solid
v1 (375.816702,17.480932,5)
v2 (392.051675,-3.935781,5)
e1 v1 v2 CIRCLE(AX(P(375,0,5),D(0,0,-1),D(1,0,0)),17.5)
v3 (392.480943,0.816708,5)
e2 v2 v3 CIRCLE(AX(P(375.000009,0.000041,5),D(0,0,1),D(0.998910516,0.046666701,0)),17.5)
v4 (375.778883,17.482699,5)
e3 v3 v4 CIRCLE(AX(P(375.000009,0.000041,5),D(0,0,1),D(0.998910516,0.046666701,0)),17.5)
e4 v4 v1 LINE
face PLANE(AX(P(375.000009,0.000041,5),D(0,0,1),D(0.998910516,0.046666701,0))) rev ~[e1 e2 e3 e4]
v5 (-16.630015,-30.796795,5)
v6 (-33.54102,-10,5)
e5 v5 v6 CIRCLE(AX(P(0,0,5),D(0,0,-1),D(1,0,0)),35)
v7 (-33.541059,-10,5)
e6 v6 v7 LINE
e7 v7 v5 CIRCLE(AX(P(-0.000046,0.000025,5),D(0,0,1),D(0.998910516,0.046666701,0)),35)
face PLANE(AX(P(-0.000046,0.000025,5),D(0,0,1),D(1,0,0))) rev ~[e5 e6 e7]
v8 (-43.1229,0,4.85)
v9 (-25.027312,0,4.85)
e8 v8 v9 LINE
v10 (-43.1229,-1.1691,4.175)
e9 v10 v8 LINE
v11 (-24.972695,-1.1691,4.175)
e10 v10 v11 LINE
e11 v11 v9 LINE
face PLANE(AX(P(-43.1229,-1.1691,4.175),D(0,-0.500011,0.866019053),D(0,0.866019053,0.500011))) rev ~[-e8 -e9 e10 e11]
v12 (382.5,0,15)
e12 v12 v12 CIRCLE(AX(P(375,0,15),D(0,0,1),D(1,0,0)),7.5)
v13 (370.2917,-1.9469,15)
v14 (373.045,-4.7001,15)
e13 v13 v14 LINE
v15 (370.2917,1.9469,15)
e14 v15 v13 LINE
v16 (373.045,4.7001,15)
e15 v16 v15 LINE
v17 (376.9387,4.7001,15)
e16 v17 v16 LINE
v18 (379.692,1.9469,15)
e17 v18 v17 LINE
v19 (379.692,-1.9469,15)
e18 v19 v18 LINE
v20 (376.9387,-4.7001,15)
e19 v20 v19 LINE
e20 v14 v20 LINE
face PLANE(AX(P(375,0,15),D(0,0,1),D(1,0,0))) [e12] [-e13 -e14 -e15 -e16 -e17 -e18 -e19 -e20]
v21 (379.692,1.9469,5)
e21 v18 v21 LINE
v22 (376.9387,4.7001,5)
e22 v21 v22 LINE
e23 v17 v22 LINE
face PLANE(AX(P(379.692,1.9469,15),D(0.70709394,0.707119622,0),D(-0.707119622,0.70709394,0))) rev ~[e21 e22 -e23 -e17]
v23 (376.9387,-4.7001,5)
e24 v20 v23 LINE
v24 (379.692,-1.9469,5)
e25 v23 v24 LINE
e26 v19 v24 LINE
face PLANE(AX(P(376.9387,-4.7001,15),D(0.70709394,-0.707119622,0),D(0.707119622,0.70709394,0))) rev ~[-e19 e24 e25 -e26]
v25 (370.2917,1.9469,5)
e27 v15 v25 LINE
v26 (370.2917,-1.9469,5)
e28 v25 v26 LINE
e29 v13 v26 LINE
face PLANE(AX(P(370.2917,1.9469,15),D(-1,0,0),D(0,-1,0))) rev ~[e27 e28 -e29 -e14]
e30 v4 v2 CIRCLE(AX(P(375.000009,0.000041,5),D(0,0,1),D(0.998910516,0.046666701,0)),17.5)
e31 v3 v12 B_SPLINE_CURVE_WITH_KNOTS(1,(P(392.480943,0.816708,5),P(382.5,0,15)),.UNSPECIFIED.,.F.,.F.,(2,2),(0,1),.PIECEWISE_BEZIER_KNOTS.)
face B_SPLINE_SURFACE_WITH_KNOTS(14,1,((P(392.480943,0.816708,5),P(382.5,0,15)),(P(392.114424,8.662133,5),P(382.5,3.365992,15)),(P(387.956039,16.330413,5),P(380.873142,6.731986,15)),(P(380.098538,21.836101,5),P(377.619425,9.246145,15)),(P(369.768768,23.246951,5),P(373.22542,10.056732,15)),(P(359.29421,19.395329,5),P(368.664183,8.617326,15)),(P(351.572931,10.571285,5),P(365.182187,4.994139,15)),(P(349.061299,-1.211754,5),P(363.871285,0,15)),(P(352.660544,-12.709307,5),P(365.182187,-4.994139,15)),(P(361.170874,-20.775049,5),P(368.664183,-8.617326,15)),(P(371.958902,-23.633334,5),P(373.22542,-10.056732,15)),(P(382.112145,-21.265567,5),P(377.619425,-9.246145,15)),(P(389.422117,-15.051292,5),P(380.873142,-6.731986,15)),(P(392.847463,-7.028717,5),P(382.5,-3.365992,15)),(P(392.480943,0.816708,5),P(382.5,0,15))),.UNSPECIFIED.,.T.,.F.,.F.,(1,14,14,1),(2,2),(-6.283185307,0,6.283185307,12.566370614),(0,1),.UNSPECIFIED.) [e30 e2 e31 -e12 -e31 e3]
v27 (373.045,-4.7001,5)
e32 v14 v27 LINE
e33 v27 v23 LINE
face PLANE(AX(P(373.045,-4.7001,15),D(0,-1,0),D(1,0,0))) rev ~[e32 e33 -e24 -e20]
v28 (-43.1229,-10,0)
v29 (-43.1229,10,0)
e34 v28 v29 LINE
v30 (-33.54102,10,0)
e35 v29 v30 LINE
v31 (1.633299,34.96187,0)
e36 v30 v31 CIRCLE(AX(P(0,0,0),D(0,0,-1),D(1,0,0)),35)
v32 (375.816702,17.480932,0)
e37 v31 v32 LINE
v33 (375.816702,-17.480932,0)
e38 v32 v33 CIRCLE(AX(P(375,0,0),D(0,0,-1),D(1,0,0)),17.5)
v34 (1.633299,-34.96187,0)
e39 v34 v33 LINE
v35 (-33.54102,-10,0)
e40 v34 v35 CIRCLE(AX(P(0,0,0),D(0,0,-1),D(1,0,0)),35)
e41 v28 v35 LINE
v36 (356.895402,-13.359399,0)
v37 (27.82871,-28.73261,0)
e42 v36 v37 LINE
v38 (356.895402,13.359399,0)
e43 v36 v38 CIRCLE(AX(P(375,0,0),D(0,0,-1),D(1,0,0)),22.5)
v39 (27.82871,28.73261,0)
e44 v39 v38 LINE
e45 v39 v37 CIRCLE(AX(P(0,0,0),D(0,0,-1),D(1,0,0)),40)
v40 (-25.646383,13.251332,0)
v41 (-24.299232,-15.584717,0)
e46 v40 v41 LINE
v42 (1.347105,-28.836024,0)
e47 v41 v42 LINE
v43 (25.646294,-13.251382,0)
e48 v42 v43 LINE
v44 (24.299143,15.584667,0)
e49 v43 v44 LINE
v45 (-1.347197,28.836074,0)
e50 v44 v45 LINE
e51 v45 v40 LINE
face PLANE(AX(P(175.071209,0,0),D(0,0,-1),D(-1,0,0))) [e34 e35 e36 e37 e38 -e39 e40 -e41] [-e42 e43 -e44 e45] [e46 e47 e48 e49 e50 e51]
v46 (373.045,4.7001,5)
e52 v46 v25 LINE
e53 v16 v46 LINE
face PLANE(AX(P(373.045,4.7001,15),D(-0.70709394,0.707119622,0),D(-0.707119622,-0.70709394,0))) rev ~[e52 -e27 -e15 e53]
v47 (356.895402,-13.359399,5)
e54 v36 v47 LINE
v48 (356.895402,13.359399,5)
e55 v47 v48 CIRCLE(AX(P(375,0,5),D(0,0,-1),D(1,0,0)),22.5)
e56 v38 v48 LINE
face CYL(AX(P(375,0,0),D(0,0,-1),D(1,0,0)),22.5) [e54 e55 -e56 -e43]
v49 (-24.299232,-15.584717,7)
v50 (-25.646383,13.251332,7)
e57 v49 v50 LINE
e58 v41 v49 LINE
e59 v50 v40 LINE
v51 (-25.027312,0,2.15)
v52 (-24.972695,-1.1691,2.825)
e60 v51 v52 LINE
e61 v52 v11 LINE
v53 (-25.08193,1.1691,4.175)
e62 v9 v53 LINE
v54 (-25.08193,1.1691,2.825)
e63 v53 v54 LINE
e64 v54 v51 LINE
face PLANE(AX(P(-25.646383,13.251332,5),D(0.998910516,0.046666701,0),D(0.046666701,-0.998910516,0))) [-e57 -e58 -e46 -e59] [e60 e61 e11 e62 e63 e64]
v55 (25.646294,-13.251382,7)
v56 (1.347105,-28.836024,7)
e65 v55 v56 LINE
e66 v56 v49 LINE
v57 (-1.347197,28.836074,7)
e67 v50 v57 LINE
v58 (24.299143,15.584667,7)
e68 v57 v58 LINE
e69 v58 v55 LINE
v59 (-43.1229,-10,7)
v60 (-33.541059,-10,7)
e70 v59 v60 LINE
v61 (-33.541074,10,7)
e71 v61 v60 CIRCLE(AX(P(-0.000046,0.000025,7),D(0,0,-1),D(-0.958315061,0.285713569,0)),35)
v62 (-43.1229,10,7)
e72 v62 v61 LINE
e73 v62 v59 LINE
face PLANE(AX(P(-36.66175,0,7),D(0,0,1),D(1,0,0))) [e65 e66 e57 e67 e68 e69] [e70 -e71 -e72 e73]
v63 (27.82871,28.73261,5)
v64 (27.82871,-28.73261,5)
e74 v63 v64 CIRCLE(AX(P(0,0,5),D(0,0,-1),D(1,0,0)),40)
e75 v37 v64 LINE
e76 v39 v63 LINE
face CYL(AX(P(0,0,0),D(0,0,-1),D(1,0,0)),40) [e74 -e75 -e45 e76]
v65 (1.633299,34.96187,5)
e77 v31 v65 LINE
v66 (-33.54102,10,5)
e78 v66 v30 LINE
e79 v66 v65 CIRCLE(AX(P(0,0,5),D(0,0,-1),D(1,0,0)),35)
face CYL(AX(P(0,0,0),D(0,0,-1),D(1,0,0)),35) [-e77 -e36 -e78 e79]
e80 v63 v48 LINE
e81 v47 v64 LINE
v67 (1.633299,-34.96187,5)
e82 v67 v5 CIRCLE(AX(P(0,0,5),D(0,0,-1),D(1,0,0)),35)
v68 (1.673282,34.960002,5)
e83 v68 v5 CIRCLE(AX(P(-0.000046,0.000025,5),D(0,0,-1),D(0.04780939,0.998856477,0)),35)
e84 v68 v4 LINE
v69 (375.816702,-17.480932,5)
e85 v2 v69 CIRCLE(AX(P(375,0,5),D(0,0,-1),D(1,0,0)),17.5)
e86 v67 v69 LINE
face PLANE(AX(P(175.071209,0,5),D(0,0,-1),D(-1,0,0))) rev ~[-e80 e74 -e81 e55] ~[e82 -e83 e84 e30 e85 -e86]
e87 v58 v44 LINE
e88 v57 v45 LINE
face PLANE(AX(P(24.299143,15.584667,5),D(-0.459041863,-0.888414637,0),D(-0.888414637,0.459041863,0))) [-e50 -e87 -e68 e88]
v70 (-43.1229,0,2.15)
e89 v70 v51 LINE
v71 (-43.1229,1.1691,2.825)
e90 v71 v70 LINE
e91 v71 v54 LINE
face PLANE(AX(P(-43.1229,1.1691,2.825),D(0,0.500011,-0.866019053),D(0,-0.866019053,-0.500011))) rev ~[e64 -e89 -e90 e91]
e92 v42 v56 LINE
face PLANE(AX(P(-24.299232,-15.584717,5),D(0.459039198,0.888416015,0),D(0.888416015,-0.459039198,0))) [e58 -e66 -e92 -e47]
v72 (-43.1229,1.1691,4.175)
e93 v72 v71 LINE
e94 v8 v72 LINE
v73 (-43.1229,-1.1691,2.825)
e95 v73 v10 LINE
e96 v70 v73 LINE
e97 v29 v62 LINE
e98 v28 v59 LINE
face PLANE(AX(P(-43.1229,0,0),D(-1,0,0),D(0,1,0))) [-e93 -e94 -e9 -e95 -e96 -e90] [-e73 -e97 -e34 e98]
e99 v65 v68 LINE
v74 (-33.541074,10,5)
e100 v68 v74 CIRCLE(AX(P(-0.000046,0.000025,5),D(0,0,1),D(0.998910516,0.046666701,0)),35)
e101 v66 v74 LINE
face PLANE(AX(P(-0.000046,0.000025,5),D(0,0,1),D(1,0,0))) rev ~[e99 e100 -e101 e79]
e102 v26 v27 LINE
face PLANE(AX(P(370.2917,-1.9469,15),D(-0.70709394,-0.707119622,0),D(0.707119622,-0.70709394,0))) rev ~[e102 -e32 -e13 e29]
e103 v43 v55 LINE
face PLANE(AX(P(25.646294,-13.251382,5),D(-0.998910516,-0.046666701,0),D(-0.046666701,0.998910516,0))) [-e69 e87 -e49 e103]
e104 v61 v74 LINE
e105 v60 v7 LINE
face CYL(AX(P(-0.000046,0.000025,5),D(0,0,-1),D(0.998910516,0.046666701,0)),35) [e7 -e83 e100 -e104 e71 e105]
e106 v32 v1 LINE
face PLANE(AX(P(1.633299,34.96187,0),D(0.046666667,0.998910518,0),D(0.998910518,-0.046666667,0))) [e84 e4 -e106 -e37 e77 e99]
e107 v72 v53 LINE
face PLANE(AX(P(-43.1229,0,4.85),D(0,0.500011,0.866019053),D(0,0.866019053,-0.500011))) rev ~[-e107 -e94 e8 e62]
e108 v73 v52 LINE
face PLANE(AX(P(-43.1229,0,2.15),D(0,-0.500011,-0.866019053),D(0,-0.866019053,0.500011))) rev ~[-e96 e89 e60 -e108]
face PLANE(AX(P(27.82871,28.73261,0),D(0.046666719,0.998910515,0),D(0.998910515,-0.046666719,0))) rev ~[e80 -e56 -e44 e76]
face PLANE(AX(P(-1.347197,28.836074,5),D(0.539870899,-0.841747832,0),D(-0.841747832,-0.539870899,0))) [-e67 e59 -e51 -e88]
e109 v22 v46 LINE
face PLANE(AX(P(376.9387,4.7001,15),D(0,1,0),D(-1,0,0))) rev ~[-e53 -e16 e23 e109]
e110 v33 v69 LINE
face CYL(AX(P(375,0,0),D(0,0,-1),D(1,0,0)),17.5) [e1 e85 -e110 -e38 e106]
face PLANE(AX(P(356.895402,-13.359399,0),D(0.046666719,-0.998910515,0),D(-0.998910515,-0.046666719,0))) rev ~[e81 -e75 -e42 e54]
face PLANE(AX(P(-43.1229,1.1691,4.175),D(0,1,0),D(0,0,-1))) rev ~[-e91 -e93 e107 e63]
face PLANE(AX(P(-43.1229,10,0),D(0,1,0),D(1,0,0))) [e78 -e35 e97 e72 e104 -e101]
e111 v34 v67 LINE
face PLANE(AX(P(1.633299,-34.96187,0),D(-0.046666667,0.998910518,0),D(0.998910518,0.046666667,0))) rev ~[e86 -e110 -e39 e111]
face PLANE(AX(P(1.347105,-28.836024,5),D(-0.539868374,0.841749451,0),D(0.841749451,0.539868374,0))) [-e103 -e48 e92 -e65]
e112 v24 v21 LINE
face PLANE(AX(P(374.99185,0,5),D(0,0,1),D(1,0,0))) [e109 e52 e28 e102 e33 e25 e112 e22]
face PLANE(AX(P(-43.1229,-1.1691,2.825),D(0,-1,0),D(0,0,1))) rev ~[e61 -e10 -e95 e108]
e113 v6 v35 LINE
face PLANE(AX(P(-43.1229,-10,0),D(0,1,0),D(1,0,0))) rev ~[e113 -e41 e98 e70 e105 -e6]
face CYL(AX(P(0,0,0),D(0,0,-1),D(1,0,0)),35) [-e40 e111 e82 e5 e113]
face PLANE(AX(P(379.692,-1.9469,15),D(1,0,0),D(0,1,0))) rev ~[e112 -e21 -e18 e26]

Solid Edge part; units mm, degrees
sketch "Sketch1" plane through (0, 0, 0) normal (0, 0, 1) x (1, 0, 0)
  line L0 (1.6333, 34.9619) -> (375.8167, 17.4809)
  line L1 (1.6333, -34.9619) -> (375.8167, -17.4809)
  arc A0 (1.6333, -34.9619) -> (1.6333, 34.9619) centre (0, 0) cw
  arc A1 (375.8167, 17.4809) -> (375.8167, -17.4809) centre (375, 0) cw
extrude "Protrusion1" add sketch "Sketch1" along normal blind 5
sketch "Sketch2" plane through (178.75, 0, 5) normal (0, 0, 1) x (0.9989105, 0.0466667, 0)
  circle A0 centre (-178.5553, 8.3417) radius 35
extrude "ExtrudedProtrusion_2" add sketch "Sketch2" along normal blind 2
sketch "Sketch3" plane through (178.75, 0, 5) normal (0, 0, 1) x (0.9989105, 0.0466667, 0)
  circle A0 centre (196.0362, -9.1583) radius 17.5
sketch "Sketch4" plane through (0, 0, 15) normal (0, 0, 1) x (1, 0, 0)
  circle A0 centre (375, 0) radius 7.5
loft "LoftedProtrusion1" add profiles "Sketch3", "Sketch4"
sketch "Sketch5" plane through (0, 0, 15) normal (0, 0, 1) x (1, 0, 0)
  line L0 (370.2917, 1.9469) -> (370.2917, -1.9469)
  line L1 (370.2917, -1.9469) -> (373.045, -4.7001)
  line L2 (373.045, -4.7001) -> (376.9387, -4.7001)
  line L3 (376.9387, -4.7001) -> (379.692, -1.9469)
  line L4 (379.692, -1.9469) -> (379.692, 1.9469)
  line L5 (379.692, 1.9469) -> (376.9387, 4.7001)
  line L6 (376.9387, 4.7001) -> (373.045, 4.7001)
  line L7 (373.045, 4.7001) -> (370.2917, 1.9469)
extrude "ExtrudedCutout_2" cut sketch "Sketch5" against normal blind 10
sketch "Sketch6" plane through (0, 0, 0) normal (0, 0, 1) x (1, 0, 0)
  line L0 (-43.1229, 0) -> (-43.1229, -10)
  line L1 (-43.1229, -10) -> (-30.2006, -10)
  line L2 (-30.2006, -10) -> (-30.2006, 10)
  line L3 (-43.1229, 10) -> (-30.2006, 10)
  line L4 (-43.1229, 0) -> (-43.1229, 10)
extrude "ExtrudedProtrusion_3" add sketch "Sketch6" along normal blind 7
sketch "Sketch7" plane through (-43.1229, 0, 3.5) normal (-1, 0, 0) x (0, -1, 0)
  line L0 (1.1691, 0.675) -> (0, 1.35)
  line L1 (0, 1.35) -> (-1.1691, 0.675)
  line L2 (-1.1691, 0.675) -> (-1.1691, -0.675)
  line L3 (-1.1691, -0.675) -> (0, -1.35)
  line L4 (0, -1.35) -> (1.1691, -0.675)
  line L5 (1.1691, -0.675) -> (1.1691, 0.675)
extrude "ExtrudedCutout_3" cut sketch "Sketch7" against normal blind 35.7346
sketch "Sketch8" plane through (178.75, 0, 5) normal (0, 0, 1) x (0.9989105, 0.0466667, 0)
  line L0 (-203.5553, 22.7754) -> (-203.5553, -6.0921)
  line L1 (-203.5553, -6.0921) -> (-178.5553, -20.5258)
  line L2 (-178.5553, -20.5258) -> (-153.5553, -6.0921)
  line L3 (-153.5553, -6.0921) -> (-153.5553, 22.7754)
  line L4 (-153.5553, 22.7754) -> (-178.5553, 37.2092)
  line L5 (-178.5553, 37.2092) -> (-203.5553, 22.7754)
extrude "ExtrudedCutout_4" cut sketch "Sketch8" along normal mid plane 70.6133
sketch "Sketch9" plane through (0, 0, 0) normal (0, 0, 1) x (1, 0, 0)
  line L0 (27.8287, 28.7326) -> (356.8954, 13.3594)
  line L1 (356.8954, -13.3594) -> (27.8287, -28.7326)
  arc A0 (356.8954, -13.3594) -> (356.8954, 13.3594) centre (375, 0) cw
  arc A1 (27.8287, 28.7326) -> (27.8287, -28.7326) centre (0, 0) cw
extrude "ExtrudedCutout_5" cut sketch "Sketch9" along normal blind 54.5495
